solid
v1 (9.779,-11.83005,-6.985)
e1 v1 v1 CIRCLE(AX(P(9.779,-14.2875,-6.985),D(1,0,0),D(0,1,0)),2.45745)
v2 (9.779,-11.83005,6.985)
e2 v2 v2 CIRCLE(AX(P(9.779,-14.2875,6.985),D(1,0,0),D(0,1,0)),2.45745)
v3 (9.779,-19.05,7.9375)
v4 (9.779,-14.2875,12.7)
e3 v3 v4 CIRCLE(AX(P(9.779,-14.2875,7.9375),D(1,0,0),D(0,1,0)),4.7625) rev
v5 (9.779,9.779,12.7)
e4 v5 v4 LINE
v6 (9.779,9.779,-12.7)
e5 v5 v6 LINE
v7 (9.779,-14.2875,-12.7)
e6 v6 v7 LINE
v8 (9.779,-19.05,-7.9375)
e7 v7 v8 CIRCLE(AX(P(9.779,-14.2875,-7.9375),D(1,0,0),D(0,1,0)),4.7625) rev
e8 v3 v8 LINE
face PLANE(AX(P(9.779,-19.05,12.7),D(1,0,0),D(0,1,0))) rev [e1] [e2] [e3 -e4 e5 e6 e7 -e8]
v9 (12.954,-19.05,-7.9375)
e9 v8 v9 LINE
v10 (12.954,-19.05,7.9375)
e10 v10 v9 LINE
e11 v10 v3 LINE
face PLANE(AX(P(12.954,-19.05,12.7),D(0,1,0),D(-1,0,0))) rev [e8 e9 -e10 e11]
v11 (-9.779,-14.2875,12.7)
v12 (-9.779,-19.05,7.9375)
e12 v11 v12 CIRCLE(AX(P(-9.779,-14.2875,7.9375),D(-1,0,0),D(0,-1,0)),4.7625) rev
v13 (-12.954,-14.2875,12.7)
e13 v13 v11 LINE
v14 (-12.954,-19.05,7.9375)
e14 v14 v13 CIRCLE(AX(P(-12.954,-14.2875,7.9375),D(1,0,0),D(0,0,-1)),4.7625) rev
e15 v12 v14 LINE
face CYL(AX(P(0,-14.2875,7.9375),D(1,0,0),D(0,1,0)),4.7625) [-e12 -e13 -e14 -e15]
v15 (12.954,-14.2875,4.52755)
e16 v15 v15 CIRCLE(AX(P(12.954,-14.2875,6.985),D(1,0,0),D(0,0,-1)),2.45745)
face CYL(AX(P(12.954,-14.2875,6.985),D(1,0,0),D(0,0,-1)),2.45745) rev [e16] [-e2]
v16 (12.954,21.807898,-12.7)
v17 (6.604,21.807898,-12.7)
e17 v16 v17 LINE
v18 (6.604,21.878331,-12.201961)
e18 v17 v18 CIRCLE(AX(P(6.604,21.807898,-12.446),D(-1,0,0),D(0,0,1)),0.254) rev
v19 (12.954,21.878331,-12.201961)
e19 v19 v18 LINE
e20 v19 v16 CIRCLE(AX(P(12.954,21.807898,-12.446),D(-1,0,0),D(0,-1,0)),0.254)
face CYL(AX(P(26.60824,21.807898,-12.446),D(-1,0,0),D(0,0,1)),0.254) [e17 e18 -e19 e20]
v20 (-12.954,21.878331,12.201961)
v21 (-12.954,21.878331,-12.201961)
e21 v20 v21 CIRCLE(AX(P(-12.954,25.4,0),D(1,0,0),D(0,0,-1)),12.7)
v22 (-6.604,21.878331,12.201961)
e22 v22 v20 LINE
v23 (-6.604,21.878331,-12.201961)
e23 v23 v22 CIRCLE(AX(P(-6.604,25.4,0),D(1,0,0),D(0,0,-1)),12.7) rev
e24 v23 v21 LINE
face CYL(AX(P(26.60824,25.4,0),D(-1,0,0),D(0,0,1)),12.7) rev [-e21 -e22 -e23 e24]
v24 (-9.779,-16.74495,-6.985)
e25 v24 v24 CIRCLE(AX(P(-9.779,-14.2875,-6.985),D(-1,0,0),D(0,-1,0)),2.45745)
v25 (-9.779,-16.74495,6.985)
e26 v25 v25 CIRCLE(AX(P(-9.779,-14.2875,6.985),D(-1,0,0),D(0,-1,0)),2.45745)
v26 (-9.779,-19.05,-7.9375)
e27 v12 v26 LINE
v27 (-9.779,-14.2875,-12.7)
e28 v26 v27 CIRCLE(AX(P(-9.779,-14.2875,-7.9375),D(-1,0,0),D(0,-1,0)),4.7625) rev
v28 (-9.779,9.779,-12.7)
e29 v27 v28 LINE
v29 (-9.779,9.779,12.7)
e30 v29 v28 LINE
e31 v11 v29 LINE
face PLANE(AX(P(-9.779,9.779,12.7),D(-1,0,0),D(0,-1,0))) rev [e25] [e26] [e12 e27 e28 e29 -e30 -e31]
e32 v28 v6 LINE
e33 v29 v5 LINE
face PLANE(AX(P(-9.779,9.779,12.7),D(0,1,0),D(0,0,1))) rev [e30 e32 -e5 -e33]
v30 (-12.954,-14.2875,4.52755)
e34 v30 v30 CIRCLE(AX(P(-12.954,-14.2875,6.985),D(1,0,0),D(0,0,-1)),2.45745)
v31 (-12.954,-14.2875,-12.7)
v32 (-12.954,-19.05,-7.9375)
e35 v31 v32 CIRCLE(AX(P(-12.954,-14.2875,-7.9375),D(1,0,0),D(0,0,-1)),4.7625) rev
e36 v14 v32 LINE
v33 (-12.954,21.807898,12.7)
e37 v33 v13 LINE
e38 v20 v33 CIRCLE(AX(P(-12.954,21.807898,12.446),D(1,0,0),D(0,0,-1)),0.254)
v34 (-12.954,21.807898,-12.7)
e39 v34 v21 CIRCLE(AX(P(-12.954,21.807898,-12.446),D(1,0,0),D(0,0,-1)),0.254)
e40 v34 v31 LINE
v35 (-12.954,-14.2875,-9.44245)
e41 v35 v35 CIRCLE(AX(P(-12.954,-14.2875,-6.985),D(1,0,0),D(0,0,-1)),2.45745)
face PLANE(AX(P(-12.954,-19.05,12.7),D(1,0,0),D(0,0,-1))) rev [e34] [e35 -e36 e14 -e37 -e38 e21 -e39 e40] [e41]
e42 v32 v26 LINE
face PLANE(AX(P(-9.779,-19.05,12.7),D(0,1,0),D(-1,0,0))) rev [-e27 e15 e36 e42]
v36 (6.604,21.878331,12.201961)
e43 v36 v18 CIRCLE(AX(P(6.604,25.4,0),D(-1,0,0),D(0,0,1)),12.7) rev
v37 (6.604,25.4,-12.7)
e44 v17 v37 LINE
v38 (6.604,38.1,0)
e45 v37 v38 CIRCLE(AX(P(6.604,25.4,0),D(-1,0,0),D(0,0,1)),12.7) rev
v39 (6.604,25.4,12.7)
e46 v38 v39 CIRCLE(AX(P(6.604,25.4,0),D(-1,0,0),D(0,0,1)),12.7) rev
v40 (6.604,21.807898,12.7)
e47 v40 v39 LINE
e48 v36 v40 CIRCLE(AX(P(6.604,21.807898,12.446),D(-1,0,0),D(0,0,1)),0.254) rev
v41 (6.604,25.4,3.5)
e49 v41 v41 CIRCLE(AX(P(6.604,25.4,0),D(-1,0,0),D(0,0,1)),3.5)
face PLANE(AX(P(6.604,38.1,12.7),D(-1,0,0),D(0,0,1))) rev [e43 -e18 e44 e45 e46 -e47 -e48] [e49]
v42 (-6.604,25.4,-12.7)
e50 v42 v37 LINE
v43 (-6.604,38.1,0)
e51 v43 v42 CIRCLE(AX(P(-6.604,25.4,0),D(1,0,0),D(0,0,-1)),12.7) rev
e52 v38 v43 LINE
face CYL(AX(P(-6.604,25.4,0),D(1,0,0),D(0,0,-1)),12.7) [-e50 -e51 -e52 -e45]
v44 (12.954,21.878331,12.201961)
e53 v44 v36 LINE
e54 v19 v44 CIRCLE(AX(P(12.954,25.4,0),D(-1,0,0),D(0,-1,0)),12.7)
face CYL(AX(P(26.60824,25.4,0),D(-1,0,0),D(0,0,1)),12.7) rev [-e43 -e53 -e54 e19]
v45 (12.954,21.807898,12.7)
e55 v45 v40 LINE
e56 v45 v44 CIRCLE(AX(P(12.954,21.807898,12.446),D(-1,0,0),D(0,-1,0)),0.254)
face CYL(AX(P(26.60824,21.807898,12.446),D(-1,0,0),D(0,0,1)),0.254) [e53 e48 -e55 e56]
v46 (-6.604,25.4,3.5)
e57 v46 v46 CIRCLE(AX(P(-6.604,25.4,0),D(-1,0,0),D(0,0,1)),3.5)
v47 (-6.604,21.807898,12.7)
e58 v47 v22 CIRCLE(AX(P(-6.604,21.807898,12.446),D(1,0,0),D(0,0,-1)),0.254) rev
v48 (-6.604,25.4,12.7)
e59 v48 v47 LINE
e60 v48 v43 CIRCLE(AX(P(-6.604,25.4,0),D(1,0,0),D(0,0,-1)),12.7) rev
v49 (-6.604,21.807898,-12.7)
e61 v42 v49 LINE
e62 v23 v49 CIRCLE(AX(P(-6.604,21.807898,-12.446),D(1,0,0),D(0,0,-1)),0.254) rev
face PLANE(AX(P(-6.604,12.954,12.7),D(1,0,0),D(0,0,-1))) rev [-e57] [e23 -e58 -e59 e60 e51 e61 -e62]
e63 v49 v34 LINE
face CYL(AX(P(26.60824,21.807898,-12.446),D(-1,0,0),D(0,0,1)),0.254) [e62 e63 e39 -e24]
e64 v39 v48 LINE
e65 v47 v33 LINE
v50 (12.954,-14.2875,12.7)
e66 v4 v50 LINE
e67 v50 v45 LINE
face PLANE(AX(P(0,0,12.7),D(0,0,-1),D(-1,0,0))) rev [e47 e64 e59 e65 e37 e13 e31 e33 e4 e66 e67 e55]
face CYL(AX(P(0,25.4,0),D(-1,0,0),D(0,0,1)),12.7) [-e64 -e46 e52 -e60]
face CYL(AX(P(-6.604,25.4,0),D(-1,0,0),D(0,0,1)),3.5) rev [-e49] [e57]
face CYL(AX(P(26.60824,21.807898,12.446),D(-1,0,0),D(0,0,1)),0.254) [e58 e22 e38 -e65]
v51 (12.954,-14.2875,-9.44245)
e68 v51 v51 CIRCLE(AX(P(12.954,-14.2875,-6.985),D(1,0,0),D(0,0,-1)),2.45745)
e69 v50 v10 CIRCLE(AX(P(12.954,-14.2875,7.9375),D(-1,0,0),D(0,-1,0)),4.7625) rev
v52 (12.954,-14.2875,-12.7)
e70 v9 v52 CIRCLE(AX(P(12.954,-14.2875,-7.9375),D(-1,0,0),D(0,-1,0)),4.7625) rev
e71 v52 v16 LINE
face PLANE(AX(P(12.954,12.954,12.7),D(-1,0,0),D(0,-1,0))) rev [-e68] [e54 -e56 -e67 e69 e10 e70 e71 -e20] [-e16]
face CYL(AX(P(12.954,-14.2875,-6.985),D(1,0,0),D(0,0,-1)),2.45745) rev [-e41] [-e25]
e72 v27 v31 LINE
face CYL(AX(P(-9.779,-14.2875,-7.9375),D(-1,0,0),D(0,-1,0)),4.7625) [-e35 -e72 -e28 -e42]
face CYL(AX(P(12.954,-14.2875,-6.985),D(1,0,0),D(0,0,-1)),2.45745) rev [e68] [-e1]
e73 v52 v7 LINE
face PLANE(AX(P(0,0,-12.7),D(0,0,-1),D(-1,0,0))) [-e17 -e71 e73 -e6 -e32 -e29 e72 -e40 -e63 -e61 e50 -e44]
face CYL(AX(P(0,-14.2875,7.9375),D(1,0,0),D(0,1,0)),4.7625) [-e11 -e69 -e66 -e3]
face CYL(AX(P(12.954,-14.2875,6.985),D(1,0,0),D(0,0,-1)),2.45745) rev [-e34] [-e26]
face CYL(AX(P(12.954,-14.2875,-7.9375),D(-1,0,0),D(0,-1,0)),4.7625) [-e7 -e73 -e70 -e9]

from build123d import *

# Parameters (mm, degrees)
BOSS_EXTRUDE4_DEPTH   = 12.7
F_8_CLEARANCE_HOLE1_D = 4.9149
FILLET2_R             = 4.7625
FILLET3_R             = 12.7
M6_CLEARANCE_HOLE2_D  = 7
BOSS_EXTRUDE5_START   = -19.558
BOSS_EXTRUDE5_DEPTH   = 25.908
CUT_EXTRUDE1_START    = -6.35
CUT_EXTRUDE1_DEPTH    = 6.35
CUT_EXTRUDE2_START    = -25.908
CUT_EXTRUDE2_DEPTH    = 6.35


with BuildPart() as part:
    # Sketch7 → Boss-Extrude4 (new, symmetric)
    with BuildSketch(Plane.XY):
        Polygon((-12.954, -19.05), (-12.954, 12.954), (-6.604, 12.954), (-6.604, 38.1), (6.604, 38.1), (6.604, 12.954), (12.954, 12.954), (12.954, -19.05), (9.779, -19.05), (9.779, 9.779), (-9.779, 9.779), (-9.779, -19.05), align=None)
    extrude(amount=BOSS_EXTRUDE4_DEPTH, both=True)

    # #8 Clearance Hole1 (through all)
    with Locations(Plane(origin=(12.954, 0, 0), x_dir=(0, 0, -1), z_dir=(1, 0, 0))):
        with Locations((-6.985, -14.2875), (6.985, -14.2875)):
            Hole(F_8_CLEARANCE_HOLE1_D / 2)

    # Fillet2
    fillet2_edges = [part.edges().sort_by_distance(p)[0] for p in [
        (11.3665, -19.05, -12.7),
        (-11.3665, -19.05, -12.7),
        (-11.3665, -19.05, 12.7),
        (11.3665, -19.05, 12.7),
    ]]
    fillet(fillet2_edges, radius=FILLET2_R)

    # Fillet3
    fillet3_edges = [part.edges().sort_by_distance(p)[0] for p in [
        (0, 38.1, 12.7),
        (0, 38.1, -12.7),
    ]]
    fillet(fillet3_edges, radius=FILLET3_R - 0.0001)  # a hair under: the kernel refuses the full size

    # M6 Clearance Hole2 (through all)
    with Locations(Plane(origin=(-6.604, 0, 0), x_dir=(0, 0, -1), z_dir=(-1, 0, 0))):
        with Locations((0, -25.4)):
            Hole(M6_CLEARANCE_HOLE2_D / 2)

    # Sketch12 → Boss-Extrude5 (add)
    with BuildSketch(Plane(origin=(6.604, 0, 0), x_dir=(0, 0, -1), z_dir=(1, 0, 0)).offset(BOSS_EXTRUDE5_START)):
        with BuildLine():
            Line((-12.7, 12.954), (-12.7, 21.807897552))
            ThreePointArc((-12.7, 21.807897552), (-12.481567114, 22.059395027), (-12.201960784, 21.878330933))
            ThreePointArc((-12.201960784, 21.878330933), (-8.610950381, 16.065037036), (-2.52726809, 12.954))
            Line((-2.52726809, 12.954), (-12.7, 12.954))
        make_face()
        with BuildLine():
            Line((12.7, 12.954), (12.7, 21.807897552))
            ThreePointArc((12.7, 21.807897552), (12.481567114, 22.059395027), (12.201960784, 21.878330933))
            ThreePointArc((12.201960784, 21.878330933), (8.610950381, 16.065037036), (2.52726809, 12.954))
            Line((2.52726809, 12.954), (12.7, 12.954))
        make_face()
    extrude(amount=BOSS_EXTRUDE5_DEPTH)

    # Sketch13 → Cut-Extrude1 (cut)
    with BuildSketch(Plane(origin=(12.954, 0, 0), x_dir=(0, 0, -1), z_dir=(1, 0, 0)).offset(CUT_EXTRUDE1_START)):
        with BuildLine():
            Line((-2.52726809, 12.954), (2.52726809, 12.954))
            ThreePointArc((2.52726809, 12.954), (0, 12.7), (-2.52726809, 12.954))
        make_face()
    extrude(amount=CUT_EXTRUDE1_DEPTH, mode=Mode.SUBTRACT)

    # Sketch13<2> → Cut-Extrude2 (cut)
    with BuildSketch(Plane(origin=(12.954, 0, 0), x_dir=(0, 0, -1), z_dir=(1, 0, 0)).offset(CUT_EXTRUDE2_START)):
        with BuildLine():
            Line((-2.52726809, 12.954), (2.52726809, 12.954))
            ThreePointArc((2.52726809, 12.954), (0, 12.7), (-2.52726809, 12.954))
        make_face()
    extrude(amount=CUT_EXTRUDE2_DEPTH, mode=Mode.SUBTRACT)


solid = part.part
